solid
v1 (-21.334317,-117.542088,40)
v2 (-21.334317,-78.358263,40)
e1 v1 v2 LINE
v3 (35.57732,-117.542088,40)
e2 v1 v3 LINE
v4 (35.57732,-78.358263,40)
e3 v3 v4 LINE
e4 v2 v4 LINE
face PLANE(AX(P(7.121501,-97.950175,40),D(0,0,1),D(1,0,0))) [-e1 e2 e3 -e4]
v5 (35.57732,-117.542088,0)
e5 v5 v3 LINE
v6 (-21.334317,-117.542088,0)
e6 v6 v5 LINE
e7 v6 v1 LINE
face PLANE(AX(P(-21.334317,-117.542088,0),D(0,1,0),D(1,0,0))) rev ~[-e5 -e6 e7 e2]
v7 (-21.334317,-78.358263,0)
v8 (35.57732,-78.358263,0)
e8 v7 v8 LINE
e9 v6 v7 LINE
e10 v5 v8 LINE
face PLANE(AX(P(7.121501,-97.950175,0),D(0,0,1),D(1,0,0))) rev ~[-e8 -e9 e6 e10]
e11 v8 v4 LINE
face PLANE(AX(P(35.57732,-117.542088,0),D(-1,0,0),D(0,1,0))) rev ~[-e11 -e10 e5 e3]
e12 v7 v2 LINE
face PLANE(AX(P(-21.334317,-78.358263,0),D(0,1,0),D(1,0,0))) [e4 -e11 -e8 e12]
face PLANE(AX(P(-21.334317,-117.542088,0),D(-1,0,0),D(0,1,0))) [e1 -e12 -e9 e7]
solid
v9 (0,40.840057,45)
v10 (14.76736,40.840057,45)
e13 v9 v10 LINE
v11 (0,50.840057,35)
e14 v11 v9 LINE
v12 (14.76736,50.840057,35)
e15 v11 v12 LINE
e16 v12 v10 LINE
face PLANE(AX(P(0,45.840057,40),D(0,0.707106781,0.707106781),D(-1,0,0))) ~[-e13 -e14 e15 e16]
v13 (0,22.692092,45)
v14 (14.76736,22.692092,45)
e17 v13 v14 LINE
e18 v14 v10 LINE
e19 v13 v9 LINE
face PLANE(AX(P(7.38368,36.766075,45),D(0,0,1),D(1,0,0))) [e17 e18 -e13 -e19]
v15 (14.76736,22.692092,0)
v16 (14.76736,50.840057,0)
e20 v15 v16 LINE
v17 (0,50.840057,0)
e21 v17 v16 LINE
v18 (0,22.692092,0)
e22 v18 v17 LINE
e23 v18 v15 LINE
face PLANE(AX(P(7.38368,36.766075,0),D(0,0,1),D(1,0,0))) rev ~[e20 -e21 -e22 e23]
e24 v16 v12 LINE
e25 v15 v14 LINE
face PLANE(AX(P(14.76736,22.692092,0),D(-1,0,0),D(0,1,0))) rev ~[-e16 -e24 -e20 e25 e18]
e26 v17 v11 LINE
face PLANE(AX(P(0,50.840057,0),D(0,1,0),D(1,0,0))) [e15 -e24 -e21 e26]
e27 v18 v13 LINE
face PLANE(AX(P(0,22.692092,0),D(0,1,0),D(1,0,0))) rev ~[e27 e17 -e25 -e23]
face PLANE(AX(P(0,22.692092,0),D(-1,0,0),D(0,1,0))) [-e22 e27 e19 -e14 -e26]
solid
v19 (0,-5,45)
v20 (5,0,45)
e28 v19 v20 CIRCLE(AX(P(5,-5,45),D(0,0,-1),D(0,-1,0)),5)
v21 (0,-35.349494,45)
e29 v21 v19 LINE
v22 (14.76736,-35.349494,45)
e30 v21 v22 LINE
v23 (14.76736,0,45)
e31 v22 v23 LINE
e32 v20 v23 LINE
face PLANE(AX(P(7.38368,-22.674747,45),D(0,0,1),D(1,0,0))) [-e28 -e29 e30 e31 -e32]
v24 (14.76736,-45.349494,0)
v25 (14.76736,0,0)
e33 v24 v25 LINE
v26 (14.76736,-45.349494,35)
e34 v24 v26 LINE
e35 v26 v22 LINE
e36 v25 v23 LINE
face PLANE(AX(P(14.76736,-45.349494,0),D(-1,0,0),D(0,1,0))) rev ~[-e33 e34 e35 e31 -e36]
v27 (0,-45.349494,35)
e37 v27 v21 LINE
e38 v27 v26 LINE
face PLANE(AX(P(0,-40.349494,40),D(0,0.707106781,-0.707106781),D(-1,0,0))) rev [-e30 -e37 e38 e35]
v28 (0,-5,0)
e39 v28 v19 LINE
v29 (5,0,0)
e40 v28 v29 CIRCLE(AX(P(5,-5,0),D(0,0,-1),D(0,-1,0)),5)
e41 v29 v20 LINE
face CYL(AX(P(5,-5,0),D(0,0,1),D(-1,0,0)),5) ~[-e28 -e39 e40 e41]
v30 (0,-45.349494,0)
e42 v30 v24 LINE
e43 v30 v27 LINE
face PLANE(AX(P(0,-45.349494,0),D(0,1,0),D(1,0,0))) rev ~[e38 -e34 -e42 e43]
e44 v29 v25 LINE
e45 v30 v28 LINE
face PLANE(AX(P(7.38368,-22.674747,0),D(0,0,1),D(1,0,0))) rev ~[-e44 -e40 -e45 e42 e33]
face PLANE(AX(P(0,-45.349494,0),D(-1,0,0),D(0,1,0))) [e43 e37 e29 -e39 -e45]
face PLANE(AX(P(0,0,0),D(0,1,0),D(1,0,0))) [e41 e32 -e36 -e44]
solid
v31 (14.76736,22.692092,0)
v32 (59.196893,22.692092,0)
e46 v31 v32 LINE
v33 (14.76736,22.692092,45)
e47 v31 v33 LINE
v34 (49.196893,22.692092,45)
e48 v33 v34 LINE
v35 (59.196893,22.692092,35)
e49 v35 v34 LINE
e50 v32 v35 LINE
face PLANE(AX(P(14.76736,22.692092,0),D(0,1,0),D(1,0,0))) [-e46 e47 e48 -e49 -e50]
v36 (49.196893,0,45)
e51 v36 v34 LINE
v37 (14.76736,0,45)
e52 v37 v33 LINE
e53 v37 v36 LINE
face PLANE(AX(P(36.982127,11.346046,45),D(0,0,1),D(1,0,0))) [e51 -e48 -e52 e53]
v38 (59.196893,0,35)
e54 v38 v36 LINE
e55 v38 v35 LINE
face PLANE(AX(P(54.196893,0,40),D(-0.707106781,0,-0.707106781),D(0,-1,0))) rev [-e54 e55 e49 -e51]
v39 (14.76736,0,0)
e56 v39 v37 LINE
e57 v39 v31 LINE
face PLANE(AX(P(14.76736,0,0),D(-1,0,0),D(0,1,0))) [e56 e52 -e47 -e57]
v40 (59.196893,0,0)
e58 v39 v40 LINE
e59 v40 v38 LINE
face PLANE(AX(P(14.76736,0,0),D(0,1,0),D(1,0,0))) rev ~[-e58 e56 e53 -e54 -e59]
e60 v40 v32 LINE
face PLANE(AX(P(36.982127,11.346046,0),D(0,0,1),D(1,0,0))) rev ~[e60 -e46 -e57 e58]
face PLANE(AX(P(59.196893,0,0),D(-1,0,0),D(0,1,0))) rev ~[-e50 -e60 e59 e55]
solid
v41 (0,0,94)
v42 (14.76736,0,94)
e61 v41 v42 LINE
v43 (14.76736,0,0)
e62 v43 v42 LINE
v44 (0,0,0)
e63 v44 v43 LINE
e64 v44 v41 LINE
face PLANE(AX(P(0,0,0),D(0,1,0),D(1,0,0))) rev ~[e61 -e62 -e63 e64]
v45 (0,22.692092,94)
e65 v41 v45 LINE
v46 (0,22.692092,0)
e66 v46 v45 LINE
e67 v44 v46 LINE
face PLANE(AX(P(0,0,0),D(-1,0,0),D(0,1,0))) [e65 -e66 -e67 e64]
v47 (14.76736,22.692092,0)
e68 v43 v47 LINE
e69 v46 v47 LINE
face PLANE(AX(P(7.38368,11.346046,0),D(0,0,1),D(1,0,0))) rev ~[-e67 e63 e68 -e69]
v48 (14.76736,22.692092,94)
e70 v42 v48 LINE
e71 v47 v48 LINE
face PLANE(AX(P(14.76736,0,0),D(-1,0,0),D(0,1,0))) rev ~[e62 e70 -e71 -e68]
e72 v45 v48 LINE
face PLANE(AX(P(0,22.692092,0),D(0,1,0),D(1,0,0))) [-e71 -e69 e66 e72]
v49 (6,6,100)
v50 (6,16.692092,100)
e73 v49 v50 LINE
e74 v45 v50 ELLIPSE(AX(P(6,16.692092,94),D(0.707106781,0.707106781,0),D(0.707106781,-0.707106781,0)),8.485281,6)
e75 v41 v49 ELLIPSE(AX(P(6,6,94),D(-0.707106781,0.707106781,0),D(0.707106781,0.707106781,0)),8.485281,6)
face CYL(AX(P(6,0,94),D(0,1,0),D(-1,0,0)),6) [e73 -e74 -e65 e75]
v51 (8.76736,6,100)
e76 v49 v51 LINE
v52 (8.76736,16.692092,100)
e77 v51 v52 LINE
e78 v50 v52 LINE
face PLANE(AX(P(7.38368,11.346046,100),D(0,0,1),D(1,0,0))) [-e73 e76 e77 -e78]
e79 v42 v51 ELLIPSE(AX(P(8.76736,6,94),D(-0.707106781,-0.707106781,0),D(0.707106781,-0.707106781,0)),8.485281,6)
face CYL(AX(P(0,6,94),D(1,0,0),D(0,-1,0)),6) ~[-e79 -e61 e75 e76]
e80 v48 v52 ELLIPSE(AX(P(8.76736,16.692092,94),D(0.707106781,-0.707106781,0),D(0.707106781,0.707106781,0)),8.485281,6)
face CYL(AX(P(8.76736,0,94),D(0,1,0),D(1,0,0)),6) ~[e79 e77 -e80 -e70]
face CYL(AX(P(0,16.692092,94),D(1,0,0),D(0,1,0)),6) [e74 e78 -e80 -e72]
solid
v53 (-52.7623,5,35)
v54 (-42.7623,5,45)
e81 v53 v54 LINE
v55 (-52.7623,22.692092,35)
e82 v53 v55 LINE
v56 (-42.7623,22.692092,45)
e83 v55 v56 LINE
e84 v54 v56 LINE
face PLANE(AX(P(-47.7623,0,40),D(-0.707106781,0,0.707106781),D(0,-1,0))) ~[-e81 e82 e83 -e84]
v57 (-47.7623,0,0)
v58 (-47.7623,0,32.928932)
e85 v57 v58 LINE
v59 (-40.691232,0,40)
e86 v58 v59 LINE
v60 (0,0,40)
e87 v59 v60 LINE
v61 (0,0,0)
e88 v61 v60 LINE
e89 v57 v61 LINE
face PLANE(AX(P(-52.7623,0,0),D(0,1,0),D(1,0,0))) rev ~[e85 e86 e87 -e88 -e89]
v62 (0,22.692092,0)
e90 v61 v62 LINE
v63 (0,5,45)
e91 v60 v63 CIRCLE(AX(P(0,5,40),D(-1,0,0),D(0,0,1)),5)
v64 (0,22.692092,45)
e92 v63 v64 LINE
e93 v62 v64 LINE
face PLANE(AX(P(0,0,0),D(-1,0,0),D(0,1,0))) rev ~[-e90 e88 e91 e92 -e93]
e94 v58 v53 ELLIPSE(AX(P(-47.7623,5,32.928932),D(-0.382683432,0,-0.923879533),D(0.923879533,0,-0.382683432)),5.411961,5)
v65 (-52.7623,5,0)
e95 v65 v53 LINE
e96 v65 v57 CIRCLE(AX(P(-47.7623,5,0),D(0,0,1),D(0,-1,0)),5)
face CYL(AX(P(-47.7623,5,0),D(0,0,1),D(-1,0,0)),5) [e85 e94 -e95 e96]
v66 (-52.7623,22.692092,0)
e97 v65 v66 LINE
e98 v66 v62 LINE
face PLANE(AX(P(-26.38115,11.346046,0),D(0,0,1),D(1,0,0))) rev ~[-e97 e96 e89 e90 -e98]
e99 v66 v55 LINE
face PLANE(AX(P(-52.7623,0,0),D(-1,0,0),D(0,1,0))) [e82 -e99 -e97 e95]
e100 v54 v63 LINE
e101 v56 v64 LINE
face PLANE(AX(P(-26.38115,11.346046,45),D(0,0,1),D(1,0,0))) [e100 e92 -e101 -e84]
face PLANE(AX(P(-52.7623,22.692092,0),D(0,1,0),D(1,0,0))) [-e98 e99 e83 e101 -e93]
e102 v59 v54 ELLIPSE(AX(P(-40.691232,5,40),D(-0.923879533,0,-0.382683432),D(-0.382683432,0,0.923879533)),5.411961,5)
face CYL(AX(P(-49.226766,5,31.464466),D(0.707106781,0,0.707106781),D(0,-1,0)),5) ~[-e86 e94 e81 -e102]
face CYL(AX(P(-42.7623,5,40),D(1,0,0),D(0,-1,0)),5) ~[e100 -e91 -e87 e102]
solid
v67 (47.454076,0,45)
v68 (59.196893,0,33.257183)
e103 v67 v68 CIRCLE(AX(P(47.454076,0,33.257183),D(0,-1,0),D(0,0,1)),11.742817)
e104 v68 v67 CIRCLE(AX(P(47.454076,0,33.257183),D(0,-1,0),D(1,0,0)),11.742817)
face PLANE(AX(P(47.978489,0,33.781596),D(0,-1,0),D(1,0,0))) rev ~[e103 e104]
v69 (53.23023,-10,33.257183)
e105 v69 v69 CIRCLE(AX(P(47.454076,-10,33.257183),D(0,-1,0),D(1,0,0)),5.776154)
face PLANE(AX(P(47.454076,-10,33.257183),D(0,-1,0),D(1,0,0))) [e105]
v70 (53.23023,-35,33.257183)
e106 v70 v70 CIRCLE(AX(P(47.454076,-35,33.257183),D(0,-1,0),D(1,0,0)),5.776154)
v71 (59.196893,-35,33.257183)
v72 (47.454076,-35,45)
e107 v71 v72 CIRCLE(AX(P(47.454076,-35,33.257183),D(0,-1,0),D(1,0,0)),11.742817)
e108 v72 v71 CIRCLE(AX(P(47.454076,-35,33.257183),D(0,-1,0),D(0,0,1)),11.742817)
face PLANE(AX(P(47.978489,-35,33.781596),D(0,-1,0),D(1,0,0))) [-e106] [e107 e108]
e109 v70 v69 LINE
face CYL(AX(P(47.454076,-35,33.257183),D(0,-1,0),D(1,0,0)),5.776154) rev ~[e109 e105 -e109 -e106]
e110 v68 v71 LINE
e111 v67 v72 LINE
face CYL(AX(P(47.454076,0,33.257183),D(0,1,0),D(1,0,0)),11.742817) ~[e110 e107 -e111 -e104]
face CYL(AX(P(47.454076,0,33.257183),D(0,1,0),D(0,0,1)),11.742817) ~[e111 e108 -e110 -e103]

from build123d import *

# Parameters (mm, degrees)
F0_W      = 52.7622997761
F0_H      = 22.692091763
F10_DEPTH = 45
F0_W_2    = 14.7673599422
F0_H_2    = 45.3494936228
F0_W_3    = 44.4295331836
F0_H_3    = 28.1479656696
F2_DEPTH  = 35
F3_SIZE   = 10
F3_2_SIZE = 10
F3_3_SIZE = 10
F3_4_SIZE = 10
F4_W      = 14.7673599422
F4_H      = 22.692091763
F5_DEPTH  = 100
F11_R     = 6
F6_R      = 5.776153979
F7_DEPTH  = 25
F12_R     = 5
F13_R     = 5
F8_W      = 56.9116361439
F8_H      = 39.1838252544
F9_DEPTH  = 40


with BuildPart() as f10:
    # F0 (on Top) → F10 (new body)
    with BuildSketch(Plane.XY):
        with Locations((-26.381149888, 11.3460458815)):
            Rectangle(F0_W, F0_H)
    extrude(amount=F10_DEPTH)

    # F3#4
    f3_4_edges = [f10.edges().sort_by_distance(p)[0] for p in [
        (-52.7623, 11.346046, 45),
    ]]
    chamfer(f3_4_edges, length=F3_4_SIZE)

    # F13
    f13_edges = [f10.edges().sort_by_distance(p)[0] for p in [
        (-47.7623, 0, 40),
        (-21.38115, 0, 45),
        (-52.7623, 0, 17.5),
    ]]
    fillet(f13_edges, radius=F13_R)


with BuildPart() as f10b:
    # F0 (on Top) → F10, piece 2 (new body)
    with BuildSketch(Plane.XY):
        with Locations((7.3836799711, -22.6747468114)):
            Rectangle(F0_W_2, F0_H_2)
    extrude(amount=F10_DEPTH)

    # F3
    f3_edges = [f10b.edges().sort_by_distance(p)[0] for p in [
        (7.38368, -45.349494, 45),
    ]]
    chamfer(f3_edges, length=F3_SIZE)

    # F12
    f12_edges = [f10b.edges().sort_by_distance(p)[0] for p in [
        (0, 0, 22.5),
    ]]
    fillet(f12_edges, radius=F12_R)


with BuildPart() as f10c:
    # F0 (on Top) → F10, piece 3 (new body)
    with BuildSketch(Plane.XY):
        with Locations((36.982126534, 11.3460458815)):
            Rectangle(F0_W_3, F0_H)
    extrude(amount=F10_DEPTH)

    # F3#3
    f3_3_edges = [f10c.edges().sort_by_distance(p)[0] for p in [
        (59.196893, 11.346046, 45),
    ]]
    chamfer(f3_3_edges, length=F3_3_SIZE)


with BuildPart() as f10d:
    # F0 (on Top) → F10, piece 4 (new body)
    with BuildSketch(Plane.XY):
        with Locations((7.3836799711, 36.7660745978)):
            Rectangle(F0_W_2, F0_H_3)
    extrude(amount=F10_DEPTH)

    # F3#2
    f3_2_edges = [f10d.edges().sort_by_distance(p)[0] for p in [
        (7.38368, 50.840057, 45),
    ]]
    chamfer(f3_2_edges, length=F3_2_SIZE)


with BuildPart() as f2:
    # F1 (on face) → F2 (new body)
    with BuildSketch(Plane.XZ):
        with BuildLine():
            ThreePointArc((47.4540758133, 45), (39.1506500614, 24.9537569356), (59.1968931258, 33.2571826875))
            ThreePointArc((59.1968931258, 33.2571826875), (55.7575015652, 41.5606084394), (47.4540758133, 45))
        make_face()
    extrude(amount=F2_DEPTH)

    # F6 (on face) → F7 (cut)
    with BuildSketch(Plane.XZ.offset(35)):
        with Locations((47.4540758133, 33.2571826875)):
            Circle(F6_R)
    extrude(amount=-F7_DEPTH, mode=Mode.SUBTRACT)


with BuildPart() as f5:
    # F4 (on face) → F5 (new body)
    with BuildSketch(Plane.XY):
        with Locations((7.3836799711, 11.3460458815)):
            Rectangle(F4_W, F4_H)
    extrude(amount=F5_DEPTH)

    # F11
    f11_edges = [f5.edges().sort_by_distance(p)[0] for p in [
        (7.38368, 0, 100),
        (14.76736, 11.346046, 100),
        (7.38368, 22.692092, 100),
        (0, 11.346046, 100),
    ]]
    fillet(f11_edges, radius=F11_R)


with BuildPart() as f9:
    # F8 (on Top) → F9 (new body)
    with BuildSketch(Plane.XY):
        with Locations((7.1215014905, -97.9501754045)):
            Rectangle(F8_W, F8_H)
    extrude(amount=F9_DEPTH)


solid = Compound([f10.part, f10b.part, f10c.part, f10d.part, f2.part, f5.part, f9.part])
